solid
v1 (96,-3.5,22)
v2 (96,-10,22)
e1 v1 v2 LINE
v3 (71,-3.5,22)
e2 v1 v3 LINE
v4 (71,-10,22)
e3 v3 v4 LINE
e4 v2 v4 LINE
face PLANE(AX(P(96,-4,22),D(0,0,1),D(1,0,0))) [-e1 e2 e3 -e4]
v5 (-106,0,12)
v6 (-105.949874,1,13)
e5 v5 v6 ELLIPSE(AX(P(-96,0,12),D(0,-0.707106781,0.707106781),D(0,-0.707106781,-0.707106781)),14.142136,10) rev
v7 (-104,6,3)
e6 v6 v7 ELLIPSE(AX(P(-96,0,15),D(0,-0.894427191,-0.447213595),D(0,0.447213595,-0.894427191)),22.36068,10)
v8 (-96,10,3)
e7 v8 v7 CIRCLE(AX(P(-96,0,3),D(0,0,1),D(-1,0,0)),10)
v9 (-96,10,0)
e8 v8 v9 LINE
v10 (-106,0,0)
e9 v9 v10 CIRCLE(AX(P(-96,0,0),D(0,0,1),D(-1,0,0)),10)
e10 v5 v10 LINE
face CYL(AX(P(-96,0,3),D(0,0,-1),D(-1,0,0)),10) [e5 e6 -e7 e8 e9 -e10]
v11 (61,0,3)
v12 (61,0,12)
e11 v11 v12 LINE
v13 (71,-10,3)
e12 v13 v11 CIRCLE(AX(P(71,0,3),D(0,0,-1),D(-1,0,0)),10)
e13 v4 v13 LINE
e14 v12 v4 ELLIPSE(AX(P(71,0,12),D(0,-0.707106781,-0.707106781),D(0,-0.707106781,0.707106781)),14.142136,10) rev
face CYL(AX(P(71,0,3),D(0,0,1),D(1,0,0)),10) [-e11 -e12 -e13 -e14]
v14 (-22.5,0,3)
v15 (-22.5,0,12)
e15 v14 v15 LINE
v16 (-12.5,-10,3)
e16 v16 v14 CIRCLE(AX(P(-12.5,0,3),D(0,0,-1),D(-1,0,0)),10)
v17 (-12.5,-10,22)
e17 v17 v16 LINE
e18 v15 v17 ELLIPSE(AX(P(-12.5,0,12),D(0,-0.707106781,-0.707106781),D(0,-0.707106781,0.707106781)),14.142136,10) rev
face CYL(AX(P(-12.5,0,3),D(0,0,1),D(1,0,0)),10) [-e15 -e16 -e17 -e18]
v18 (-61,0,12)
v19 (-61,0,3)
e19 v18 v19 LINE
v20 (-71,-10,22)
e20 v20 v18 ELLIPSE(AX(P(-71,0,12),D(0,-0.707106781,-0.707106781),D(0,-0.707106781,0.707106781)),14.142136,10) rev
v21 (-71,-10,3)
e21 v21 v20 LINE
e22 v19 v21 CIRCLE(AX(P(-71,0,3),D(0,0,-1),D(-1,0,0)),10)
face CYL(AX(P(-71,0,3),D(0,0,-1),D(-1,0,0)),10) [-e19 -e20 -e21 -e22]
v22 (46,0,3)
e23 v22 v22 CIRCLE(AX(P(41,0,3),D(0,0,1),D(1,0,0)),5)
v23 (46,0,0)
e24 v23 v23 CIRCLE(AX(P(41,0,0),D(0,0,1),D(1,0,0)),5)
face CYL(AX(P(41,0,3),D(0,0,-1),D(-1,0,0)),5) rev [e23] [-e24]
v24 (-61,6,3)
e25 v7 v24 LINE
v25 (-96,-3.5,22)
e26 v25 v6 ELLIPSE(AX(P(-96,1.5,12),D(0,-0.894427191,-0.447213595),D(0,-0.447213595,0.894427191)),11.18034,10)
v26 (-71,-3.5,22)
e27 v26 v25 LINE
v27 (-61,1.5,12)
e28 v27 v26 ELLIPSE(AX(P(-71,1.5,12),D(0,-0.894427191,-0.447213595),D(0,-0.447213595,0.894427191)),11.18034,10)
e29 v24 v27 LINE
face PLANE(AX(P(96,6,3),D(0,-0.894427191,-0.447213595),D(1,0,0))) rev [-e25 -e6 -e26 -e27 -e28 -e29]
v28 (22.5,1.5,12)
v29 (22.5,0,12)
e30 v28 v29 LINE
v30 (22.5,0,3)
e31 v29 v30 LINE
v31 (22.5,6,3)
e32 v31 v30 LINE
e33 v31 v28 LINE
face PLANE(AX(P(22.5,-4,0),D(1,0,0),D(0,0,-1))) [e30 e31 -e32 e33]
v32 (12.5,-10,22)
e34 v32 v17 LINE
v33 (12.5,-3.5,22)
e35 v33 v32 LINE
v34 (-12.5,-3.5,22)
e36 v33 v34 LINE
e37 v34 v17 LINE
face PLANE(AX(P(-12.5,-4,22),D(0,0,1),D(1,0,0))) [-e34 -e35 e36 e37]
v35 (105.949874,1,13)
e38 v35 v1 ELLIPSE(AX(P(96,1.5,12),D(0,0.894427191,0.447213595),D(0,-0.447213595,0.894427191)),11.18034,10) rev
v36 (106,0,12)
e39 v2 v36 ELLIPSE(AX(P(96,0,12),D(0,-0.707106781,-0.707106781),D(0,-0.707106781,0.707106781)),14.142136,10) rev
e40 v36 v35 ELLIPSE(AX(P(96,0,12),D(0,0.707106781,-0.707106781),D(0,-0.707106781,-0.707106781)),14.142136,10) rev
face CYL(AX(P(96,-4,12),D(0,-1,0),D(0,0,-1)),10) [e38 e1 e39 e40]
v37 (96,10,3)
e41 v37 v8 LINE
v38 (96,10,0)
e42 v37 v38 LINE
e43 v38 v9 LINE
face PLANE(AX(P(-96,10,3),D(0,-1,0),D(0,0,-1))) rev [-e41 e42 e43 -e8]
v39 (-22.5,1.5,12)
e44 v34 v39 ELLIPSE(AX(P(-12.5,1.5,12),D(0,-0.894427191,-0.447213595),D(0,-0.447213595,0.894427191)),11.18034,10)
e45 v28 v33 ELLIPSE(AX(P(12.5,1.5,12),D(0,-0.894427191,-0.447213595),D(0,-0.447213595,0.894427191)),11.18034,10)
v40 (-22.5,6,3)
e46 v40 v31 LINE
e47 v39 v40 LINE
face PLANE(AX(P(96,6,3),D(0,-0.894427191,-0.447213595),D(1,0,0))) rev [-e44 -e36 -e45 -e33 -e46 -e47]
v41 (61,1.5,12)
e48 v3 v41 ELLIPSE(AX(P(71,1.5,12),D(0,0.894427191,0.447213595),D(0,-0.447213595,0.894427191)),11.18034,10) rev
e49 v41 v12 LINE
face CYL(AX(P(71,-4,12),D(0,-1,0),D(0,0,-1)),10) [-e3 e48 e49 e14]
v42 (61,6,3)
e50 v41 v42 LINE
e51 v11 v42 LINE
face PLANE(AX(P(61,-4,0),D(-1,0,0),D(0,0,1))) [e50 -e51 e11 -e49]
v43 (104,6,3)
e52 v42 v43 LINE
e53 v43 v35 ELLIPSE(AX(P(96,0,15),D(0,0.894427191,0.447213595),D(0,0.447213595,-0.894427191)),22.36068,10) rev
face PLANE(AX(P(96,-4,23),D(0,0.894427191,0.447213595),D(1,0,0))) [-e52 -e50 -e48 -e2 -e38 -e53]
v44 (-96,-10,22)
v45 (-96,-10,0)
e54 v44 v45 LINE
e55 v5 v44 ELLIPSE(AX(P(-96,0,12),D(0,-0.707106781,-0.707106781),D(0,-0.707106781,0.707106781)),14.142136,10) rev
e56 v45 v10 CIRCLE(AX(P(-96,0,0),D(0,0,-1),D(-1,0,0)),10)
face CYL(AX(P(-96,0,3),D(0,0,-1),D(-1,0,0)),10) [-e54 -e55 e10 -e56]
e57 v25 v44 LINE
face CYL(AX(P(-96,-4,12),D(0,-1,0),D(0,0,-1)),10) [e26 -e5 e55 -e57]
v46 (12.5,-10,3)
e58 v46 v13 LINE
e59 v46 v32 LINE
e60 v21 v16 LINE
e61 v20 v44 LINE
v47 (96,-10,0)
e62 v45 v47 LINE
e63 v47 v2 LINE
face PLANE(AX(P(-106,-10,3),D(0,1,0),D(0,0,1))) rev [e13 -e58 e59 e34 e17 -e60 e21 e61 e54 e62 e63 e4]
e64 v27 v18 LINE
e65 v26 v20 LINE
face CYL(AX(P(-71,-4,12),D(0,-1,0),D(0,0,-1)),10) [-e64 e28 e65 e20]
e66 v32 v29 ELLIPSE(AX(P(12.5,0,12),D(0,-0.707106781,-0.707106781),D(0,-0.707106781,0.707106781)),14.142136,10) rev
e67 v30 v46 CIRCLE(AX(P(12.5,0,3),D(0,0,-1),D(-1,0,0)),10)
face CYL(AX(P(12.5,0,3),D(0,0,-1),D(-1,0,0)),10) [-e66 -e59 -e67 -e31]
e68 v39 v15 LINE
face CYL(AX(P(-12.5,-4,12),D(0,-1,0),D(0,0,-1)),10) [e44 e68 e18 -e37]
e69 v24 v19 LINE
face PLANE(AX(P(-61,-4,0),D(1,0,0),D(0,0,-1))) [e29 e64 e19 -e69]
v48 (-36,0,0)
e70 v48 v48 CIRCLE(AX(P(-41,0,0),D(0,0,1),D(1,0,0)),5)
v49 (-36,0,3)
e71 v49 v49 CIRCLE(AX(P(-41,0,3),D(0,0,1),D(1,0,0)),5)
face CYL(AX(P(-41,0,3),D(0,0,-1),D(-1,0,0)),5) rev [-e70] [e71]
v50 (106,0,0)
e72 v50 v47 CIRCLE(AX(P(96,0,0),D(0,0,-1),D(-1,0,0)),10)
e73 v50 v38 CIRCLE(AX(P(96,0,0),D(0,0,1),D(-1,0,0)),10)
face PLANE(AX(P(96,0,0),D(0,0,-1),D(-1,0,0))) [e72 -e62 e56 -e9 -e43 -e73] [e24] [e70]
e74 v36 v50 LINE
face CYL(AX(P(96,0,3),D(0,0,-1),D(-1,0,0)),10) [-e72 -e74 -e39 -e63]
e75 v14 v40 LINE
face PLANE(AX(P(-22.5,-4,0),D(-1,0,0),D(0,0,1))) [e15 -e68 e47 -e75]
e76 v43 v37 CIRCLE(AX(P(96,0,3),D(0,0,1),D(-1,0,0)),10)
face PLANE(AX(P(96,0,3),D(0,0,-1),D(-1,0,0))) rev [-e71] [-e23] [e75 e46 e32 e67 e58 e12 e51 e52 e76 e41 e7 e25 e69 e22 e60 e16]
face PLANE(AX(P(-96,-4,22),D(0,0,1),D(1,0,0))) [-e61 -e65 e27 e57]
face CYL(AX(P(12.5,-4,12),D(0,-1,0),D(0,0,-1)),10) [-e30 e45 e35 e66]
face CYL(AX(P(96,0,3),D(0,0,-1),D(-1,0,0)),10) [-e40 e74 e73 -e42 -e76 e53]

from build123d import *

# Parameters (mm, degrees)
SKETCH1_R           = 5
BOSS_EXTRUDE1_DEPTH = 3
BOSS_EXTRUDE2_DEPTH = 6
CHAMFER1_START      = -106
CHAMFER1_DEPTH      = 45
CHAMFER1_START_2    = -22.5
CHAMFER1_2_DEPTH    = 45
CHAMFER1_START_3    = 61
CHAMFER1_3_DEPTH    = 45
CHAMFER1_START_4    = -4
CHAMFER1_4_DEPTH    = 9.159204648
CHAMFER1_START_5    = 3
CHAMFER1_5_DEPTH    = 10
FILLET1_R           = 10


with BuildPart() as part:
    # Sketch1 → Boss-Extrude1 (new body)
    with BuildSketch(Plane.XY):
        with BuildLine():
            Line((-106, -10), (106, -10))
            Line((106, -10), (106, 0))
            ThreePointArc((106, 0), (103.071067812, 7.071067812), (96, 10))
            Line((96, 10), (-96, 10))
            ThreePointArc((-96, 10), (-103.071067812, 7.071067812), (-106, 0))
            Line((-106, 0), (-106, -10))
        make_face()
        with Locations((-41, 0)):
            Circle(SKETCH1_R, mode=Mode.SUBTRACT)
        with Locations((41, 0)):
            Circle(SKETCH1_R, mode=Mode.SUBTRACT)
    extrude(amount=BOSS_EXTRUDE1_DEPTH)

    # Sketch2 → Boss-Extrude2 (add)
    with BuildSketch(Plane.XZ.offset(10)):
        with BuildLine():
            Line((-106, 0), (-61, 0))
            Line((-61, 0), (-61, 12))
            ThreePointArc((-61, 12), (-63.928932188, 19.071067812), (-71, 22))
            Line((-71, 22), (-96, 22))
            ThreePointArc((-96, 22), (-103.071067812, 19.071067812), (-106, 12))
            Line((-106, 12), (-106, 0))
        make_face()
        with BuildLine():
            Line((106, 0), (61, 0))
            Line((61, 0), (61, 12))
            ThreePointArc((61, 12), (63.928932188, 19.071067812), (71, 22))
            Line((71, 22), (96, 22))
            ThreePointArc((96, 22), (103.071067812, 19.071067812), (106, 12))
            Line((106, 12), (106, 0))
        make_face()
        with BuildLine():
            Line((-22.5, 0), (22.5, 0))
            Line((22.5, 0), (22.5, 12))
            ThreePointArc((22.5, 12), (19.571067812, 19.071067812), (12.5, 22))
            Line((12.5, 22), (-12.5, 22))
            ThreePointArc((-12.5, 22), (-19.571067812, 19.071067812), (-22.5, 12))
            Line((-22.5, 12), (-22.5, 0))
        make_face()
    extrude(amount=-BOSS_EXTRUDE2_DEPTH)

    # Chamfer1: read off the stored shape, not the designer's step
    # Chamfer1 outline → Chamfer1 (add)
    with BuildSketch(Plane.YZ.offset(CHAMFER1_START)):
        Polygon((6, 3), (-3.5, 22), (-4, 22), (-4, 3), align=None)
    extrude(amount=CHAMFER1_DEPTH)

    # Chamfer1 2 outline → Chamfer1 2 (add)
    with BuildSketch(Plane.YZ.offset(CHAMFER1_START_2)):
        Polygon((6, 3), (-3.5, 22), (-4, 22), (-4, 3), align=None)
    extrude(amount=CHAMFER1_2_DEPTH)

    # Chamfer1 3 outline → Chamfer1 3 (add)
    with BuildSketch(Plane.YZ.offset(CHAMFER1_START_3)):
        Polygon((6, 3), (-3.5, 22), (-4, 22), (-4, 3), align=None)
    extrude(amount=CHAMFER1_3_DEPTH)

    # Chamfer1 4 outline → Chamfer1 4 (cut)
    with BuildSketch(Plane(origin=(0, 0, 0), x_dir=(1, 0, 0), z_dir=(0, 1, 0)).offset(CHAMFER1_START_4)):
        with BuildLine():
            Line((-106, -22), (-96, -22))
            ThreePointArc((-96, -22), (-103.071067812, -19.071067812), (-106, -12))
            Line((-106, -12), (-106, -22))
        make_face()
        with BuildLine():
            ThreePointArc((-61, -12), (-63.928932188, -19.071067812), (-71, -22))
            Line((-71, -22), (-61, -22))
            Line((-61, -22), (-61, -12))
        make_face()
        with BuildLine():
            Line((61, -22), (71, -22))
            ThreePointArc((71, -22), (63.928932188, -19.071067812), (61, -12))
            Line((61, -12), (61, -22))
        make_face()
        with BuildLine():
            ThreePointArc((106, -12), (103.071067812, -19.071067812), (96, -22))
            Line((96, -22), (106, -22))
            Line((106, -22), (106, -12))
        make_face()
        with BuildLine():
            Line((-22.5, -22), (-12.5, -22))
            ThreePointArc((-12.5, -22), (-19.571067812, -19.071067812), (-22.5, -12))
            Line((-22.5, -12), (-22.5, -22))
        make_face()
        with BuildLine():
            ThreePointArc((22.5, -12), (19.571067812, -19.071067812), (12.5, -22))
            Line((12.5, -22), (22.5, -22))
            Line((22.5, -22), (22.5, -12))
        make_face()
    extrude(amount=CHAMFER1_4_DEPTH, mode=Mode.SUBTRACT)

    # Chamfer1 5 outline → Chamfer1 5 (cut)
    with BuildSketch(Plane.XY.offset(CHAMFER1_START_5)):
        with BuildLine():
            Line((106, 7), (103.141428429, 7))
            ThreePointArc((103.141428429, 7), (105.257815193, 3.780589618), (106, 0))
            Line((106, 0), (106, 7))
        make_face()
        with BuildLine():
            ThreePointArc((-106, 0), (-105.257815193, 3.780589618), (-103.141428429, 7))
            Line((-103.141428429, 7), (-106, 7))
            Line((-106, 7), (-106, 0))
        make_face()
    extrude(amount=CHAMFER1_5_DEPTH, mode=Mode.SUBTRACT)

    # Fillet1
    # the kernel refuses this fillet: 10 mm, written as the material it takes off along each edge
    with BuildSketch(Plane(origin=(-106, -10, -25), x_dir=(1, 0, 0), z_dir=(0, 0, 1))) as fillet1_piece_1:
        with BuildLine():
            CenterArc((FILLET1_R, FILLET1_R), FILLET1_R, 180, 90)
            Line((0, FILLET1_R), (0, 0))
            Line((0, 0), (FILLET1_R, 0))
        make_face()
    extrude(amount=62, mode=Mode.SUBTRACT)
    with BuildSketch(Plane(origin=(-61, -10, 3), x_dir=(-1, 0, 0), z_dir=(0, 0, 1)), Plane(origin=(61, -10, 3), x_dir=(0, 1, 0), z_dir=(0, 0, 1)), Plane(origin=(-22.5, -10, 37), x_dir=(1, 0, 0), z_dir=(0, 0, -1)), Plane(origin=(22.5, -10, 3), x_dir=(-1, 0, 0), z_dir=(0, 0, 1))) as fillet1_piece_2:
        with BuildLine():
            CenterArc((FILLET1_R, -FILLET1_R), FILLET1_R, 90, 90)
            Line((0, -FILLET1_R), (0, 0))
            Line((0, 0), (FILLET1_R, 0))
        make_face()
    extrude(amount=34, mode=Mode.SUBTRACT)
    with BuildSketch(Plane(origin=(106, -10, 37), x_dir=(0, 1, 0), z_dir=(0, 0, -1))) as fillet1_piece_3:
        with BuildLine():
            CenterArc((FILLET1_R, -FILLET1_R), FILLET1_R, 90, 90)
            Line((0, -FILLET1_R), (0, 0))
            Line((0, 0), (FILLET1_R, 0))
        make_face()
    extrude(amount=62, mode=Mode.SUBTRACT)


solid = part.part
